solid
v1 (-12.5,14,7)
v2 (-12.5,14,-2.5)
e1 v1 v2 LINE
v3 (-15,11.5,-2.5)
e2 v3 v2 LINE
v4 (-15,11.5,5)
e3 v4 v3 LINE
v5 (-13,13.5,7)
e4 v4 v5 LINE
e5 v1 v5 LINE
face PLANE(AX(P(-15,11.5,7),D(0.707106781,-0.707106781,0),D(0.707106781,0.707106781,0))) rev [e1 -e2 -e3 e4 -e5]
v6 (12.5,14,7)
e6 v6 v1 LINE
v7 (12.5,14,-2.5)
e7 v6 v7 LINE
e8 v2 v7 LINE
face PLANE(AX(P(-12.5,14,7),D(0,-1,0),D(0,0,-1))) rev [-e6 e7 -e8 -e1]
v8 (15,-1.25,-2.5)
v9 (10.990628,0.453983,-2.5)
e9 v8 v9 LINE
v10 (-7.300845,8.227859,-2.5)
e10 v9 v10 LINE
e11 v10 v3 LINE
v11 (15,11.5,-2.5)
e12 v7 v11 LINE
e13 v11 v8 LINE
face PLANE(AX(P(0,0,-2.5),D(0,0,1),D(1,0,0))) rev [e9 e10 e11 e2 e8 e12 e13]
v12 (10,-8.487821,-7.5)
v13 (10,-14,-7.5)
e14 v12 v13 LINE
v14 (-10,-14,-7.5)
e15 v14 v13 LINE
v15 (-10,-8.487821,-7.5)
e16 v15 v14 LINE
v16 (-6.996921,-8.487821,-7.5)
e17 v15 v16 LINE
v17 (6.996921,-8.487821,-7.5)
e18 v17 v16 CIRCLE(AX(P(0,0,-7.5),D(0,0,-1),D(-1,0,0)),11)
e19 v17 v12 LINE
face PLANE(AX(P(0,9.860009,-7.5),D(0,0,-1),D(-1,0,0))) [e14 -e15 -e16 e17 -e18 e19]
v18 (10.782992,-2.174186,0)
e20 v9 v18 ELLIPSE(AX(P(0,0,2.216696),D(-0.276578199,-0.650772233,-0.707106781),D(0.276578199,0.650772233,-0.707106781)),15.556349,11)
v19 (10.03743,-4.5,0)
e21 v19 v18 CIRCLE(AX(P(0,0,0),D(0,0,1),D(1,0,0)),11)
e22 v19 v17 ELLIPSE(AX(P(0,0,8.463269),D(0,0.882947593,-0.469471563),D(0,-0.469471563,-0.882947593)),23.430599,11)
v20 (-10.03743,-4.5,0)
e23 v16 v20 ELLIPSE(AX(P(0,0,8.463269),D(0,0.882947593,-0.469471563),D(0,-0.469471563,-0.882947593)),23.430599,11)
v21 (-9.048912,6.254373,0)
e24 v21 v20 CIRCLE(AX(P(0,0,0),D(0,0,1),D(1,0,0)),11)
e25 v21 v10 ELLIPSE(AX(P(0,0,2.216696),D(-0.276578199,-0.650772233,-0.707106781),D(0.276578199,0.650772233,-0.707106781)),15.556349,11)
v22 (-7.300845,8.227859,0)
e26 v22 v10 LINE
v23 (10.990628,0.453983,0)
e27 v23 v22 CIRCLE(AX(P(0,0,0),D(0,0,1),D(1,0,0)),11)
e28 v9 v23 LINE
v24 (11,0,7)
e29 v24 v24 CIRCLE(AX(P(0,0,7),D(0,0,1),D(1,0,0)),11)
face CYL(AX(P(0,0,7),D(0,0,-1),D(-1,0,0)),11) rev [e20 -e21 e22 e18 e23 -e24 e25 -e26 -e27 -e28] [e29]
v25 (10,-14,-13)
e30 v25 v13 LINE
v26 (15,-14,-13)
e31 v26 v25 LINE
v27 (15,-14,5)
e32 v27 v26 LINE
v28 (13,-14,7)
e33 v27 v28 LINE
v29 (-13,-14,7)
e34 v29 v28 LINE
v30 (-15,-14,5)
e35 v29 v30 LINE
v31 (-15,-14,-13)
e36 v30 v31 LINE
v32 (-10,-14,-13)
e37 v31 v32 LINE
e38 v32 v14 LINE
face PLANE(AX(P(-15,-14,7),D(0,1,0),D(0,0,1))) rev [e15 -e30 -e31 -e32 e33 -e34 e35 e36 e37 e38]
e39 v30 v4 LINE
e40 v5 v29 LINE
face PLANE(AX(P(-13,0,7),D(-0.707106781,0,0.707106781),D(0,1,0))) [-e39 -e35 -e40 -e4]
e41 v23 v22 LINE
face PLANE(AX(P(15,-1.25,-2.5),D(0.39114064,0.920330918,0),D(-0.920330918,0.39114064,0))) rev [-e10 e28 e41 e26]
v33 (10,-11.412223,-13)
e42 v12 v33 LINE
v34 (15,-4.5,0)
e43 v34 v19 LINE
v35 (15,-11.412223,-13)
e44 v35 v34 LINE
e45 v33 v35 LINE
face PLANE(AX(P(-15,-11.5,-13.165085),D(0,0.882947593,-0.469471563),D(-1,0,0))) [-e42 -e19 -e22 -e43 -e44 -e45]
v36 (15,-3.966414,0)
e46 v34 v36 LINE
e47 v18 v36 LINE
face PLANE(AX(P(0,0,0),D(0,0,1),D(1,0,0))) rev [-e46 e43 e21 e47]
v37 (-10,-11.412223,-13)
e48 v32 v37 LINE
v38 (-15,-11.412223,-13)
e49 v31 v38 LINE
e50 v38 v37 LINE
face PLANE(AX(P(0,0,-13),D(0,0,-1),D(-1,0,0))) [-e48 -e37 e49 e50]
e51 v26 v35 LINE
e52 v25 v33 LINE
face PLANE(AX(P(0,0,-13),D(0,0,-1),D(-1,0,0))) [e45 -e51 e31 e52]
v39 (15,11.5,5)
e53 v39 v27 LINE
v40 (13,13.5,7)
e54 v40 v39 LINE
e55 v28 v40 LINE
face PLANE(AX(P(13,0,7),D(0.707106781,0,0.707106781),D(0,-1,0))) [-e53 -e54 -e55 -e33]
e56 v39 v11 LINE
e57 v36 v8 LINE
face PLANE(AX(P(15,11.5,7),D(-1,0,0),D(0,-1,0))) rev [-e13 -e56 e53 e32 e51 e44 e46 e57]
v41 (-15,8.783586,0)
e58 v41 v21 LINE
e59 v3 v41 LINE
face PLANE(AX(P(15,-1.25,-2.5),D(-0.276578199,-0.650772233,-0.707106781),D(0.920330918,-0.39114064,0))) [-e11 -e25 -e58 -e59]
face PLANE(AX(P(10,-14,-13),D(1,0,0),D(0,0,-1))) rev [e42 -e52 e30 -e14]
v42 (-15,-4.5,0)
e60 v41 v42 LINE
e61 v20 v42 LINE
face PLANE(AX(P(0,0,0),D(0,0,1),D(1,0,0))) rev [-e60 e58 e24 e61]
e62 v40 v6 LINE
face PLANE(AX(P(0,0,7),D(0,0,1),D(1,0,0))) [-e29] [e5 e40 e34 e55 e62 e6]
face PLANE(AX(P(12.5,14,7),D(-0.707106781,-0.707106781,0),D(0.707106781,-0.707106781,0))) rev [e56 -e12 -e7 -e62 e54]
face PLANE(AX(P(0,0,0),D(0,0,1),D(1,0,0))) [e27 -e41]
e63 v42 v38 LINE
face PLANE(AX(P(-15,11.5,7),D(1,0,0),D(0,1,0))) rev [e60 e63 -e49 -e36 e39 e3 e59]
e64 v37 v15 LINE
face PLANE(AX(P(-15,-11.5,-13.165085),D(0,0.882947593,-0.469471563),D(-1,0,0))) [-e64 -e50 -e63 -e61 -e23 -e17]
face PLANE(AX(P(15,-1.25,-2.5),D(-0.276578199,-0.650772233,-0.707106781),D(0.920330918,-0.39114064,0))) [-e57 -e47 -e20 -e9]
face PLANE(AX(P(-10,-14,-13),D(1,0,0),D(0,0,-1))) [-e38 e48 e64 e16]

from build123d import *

# Parameters (mm, degrees)
SKETCH1_R           = 11
BOSS_EXTRUDE1_DEPTH = 7
SKETCH2_W           = 5
SKETCH2_H           = 2.5
BOSS_EXTRUDE2_DEPTH = 13
CHAMFER2_SIZE       = 2
BOSS_EXTRUDE6_DEPTH = 2.5
CHAMFER3_SIZE       = 2
CHAMFER4_SIZE       = 2
BOSS_EXTRUDE4_DEPTH = 2.5
CHAMFER6_SIZE       = 2.5
CHAMFER7_SIZE       = 7
CHAMFER7_SIZE_2     = 13.165085257


with BuildPart() as part:
    # Sketch1 → Boss-Extrude1 (new body)
    with BuildSketch(Plane.XY):
        Polygon((-15, 11.5), (-12.5, 14), (12.5, 14), (15, 11.5), (15, -14), (-15, -14), align=None)
        Circle(SKETCH1_R, mode=Mode.SUBTRACT)
    extrude(amount=BOSS_EXTRUDE1_DEPTH)

    # Sketch2 → Boss-Extrude2 (add)
    with BuildSketch(Plane(origin=(0, 0, 0), x_dir=(-1, 0, 0), z_dir=(0, 0, -1))):
        with Locations((-12.5, -12.75)):
            Rectangle(SKETCH2_W, SKETCH2_H)
        with Locations((12.5, -12.75)):
            Rectangle(SKETCH2_W, SKETCH2_H)
    extrude(amount=BOSS_EXTRUDE2_DEPTH)

    # Chamfer2
    chamfer2_edges = [part.edges().sort_by_distance(p)[0] for p in [
        (-10, -12.75, 0),
        (10, -12.75, 0),
    ]]
    chamfer(chamfer2_edges, length=CHAMFER2_SIZE)

    # Sketch5 → Boss-Extrude6 (add)
    with BuildSketch(Plane.XZ.offset(14)):
        Polygon((-10, -2), (-10, -7.5), (10, -7.5), (10, -2), (8, 0), (-8, 0), align=None)
    extrude(amount=-BOSS_EXTRUDE6_DEPTH)

    # Chamfer3
    chamfer3_edges = [part.edges().sort_by_distance(p)[0] for p in [
        (15, -1.25, 7),
    ]]
    chamfer(chamfer3_edges, length=CHAMFER3_SIZE)

    # Chamfer4
    chamfer4_edges = [part.edges().sort_by_distance(p)[0] for p in [
        (-15, -1.25, 7),
    ]]
    chamfer(chamfer4_edges, length=CHAMFER4_SIZE)

    # Sketch4 → Boss-Extrude4 (add)
    with BuildSketch(Plane(origin=(0, 0, 0), x_dir=(-1, 0, 0), z_dir=(0, 0, -1))):
        Polygon((-15, -1.25), (15, 11.5), (12.5, 14), (-12.5, 14), (-15, 11.5), align=None)
    extrude(amount=BOSS_EXTRUDE4_DEPTH)

    # Chamfer6
    # the kernel refuses this chamfer: 2.5 mm, written as the material it adds along each edge
    with BuildSketch(Plane(origin=(20.916998416, -3.764724327, 0), x_dir=(-0.39099275668343275, -0.9199829569021947, 0.02749587661058635), z_dir=(-0.9203309184584746, 0.39114064034485174, 0))) as chamfer6_piece_1_section:
        Polygon((CHAMFER6_SIZE * 0.999621916911, -CHAMFER6_SIZE * 0.0274958766106), (-CHAMFER6_SIZE * 0.0274958766106, -CHAMFER6_SIZE * 0.999621916911), (0, 0), align=None)
    chamfer6_piece_1 = extrude(amount=17.214861222, mode=Mode.PRIVATE)
    chamfer6_piece_1 = chamfer6_piece_1 - Plane(origin=(0, 0, -0.830769879), x_dir=(1, 0, 0), z_dir=(0, 0, -1)) * Cylinder(11, 45, mode=Mode.PRIVATE)
    chamfer6_piece_1 = split(chamfer6_piece_1, bisect_by=Plane(origin=(15, -1.305255327, -0.830769879), z_dir=(-1, 0, 0)), keep=Keep.TOP, mode=Mode.PRIVATE)
    add(chamfer6_piece_1)
    with BuildSketch(Plane(origin=(-1.383846422, 5.71313473, 0), x_dir=(-0.39099275668343275, -0.9199829569021946, 0.02749587661058637), z_dir=(-0.9203309184584746, 0.39114064034485174, 0))) as chamfer6_piece_2_section:
        Polygon((CHAMFER6_SIZE * 0.999621916911, -CHAMFER6_SIZE * 0.0274958766106), (-CHAMFER6_SIZE * 0.0274958766106, -CHAMFER6_SIZE * 0.999621916911), (0, 0), align=None)
    chamfer6_piece_2 = extrude(amount=21.224052785, mode=Mode.PRIVATE)
    chamfer6_piece_2 = chamfer6_piece_2 - Plane(origin=(0, 0, -0.851096237), x_dir=(1, 0, 0), z_dir=(0, 0, -1)) * Cylinder(11, 53, mode=Mode.PRIVATE)
    chamfer6_piece_2 = split(chamfer6_piece_2, bisect_by=Plane(origin=(-15, 9.126408424, -0.851096237), z_dir=(1, 0, 0)), keep=Keep.TOP, mode=Mode.PRIVATE)
    add(chamfer6_piece_2)

    # Chamfer7
    # the kernel refuses this chamfer: 13.165085257, 7 mm, written as the material it adds along each edge
    with BuildSketch(Plane(origin=(-15, -11.5, 0), x_dir=(0, 0.9979482451756082, 0.06402577567608186), z_dir=(1, 0, 0))) as chamfer7_piece_1_section:
        Polygon((CHAMFER7_SIZE * 0.997948245176, -CHAMFER7_SIZE * 0.0640257756761), (-CHAMFER7_SIZE_2 * 0.0640257756781, -CHAMFER7_SIZE_2 * 0.997948245208), (0, 0), align=None)
    chamfer7_piece_1 = extrude(amount=30, mode=Mode.PRIVATE)
    chamfer7_piece_1 = chamfer7_piece_1 - Plane(origin=(0, 0, -3.073682767), x_dir=(1, 0, 0), z_dir=(0, 0, -1)) * Cylinder(11, 113, mode=Mode.PRIVATE)
    chamfer7_piece_1 = split(chamfer7_piece_1, bisect_by=Plane(origin=(-12.500128058, -8.887755394, -7.5), z_dir=(0, 0, 1)), keep=Keep.TOP, mode=Mode.PRIVATE)
    chamfer7_piece_1 = split(chamfer7_piece_1, bisect_by=Plane(origin=(-10, -8.887755394, -3.073682767), z_dir=(-1, 0, 0)), keep=Keep.TOP, mode=Mode.PRIVATE)
    add(chamfer7_piece_1)
    with BuildSketch(Plane(origin=(-15, -11.5, 0), x_dir=(0, 0.9979482451756082, 0.06402577567608186), z_dir=(1, 0, 0))) as chamfer7_piece_2_section:
        Polygon((CHAMFER7_SIZE * 0.997948245176, -CHAMFER7_SIZE * 0.0640257756761), (-CHAMFER7_SIZE_2 * 0.0640257756781, -CHAMFER7_SIZE_2 * 0.997948245208), (0, 0), align=None)
    chamfer7_piece_2 = extrude(amount=30, mode=Mode.PRIVATE)
    chamfer7_piece_2 = split(chamfer7_piece_2, bisect_by=Plane(origin=(-12.5, -10.721530873, -7.5), z_dir=(0, 0, -1)), keep=Keep.TOP, mode=Mode.PRIVATE)
    chamfer7_piece_2 = split(chamfer7_piece_2, bisect_by=Plane(origin=(-10, -10.721530873, -9.597564575), z_dir=(-1, 0, 0)), keep=Keep.TOP, mode=Mode.PRIVATE)
    chamfer7_piece_2 = split(chamfer7_piece_2, bisect_by=Plane(origin=(-12.5, -10.721530873, -13), z_dir=(0, 0, 1)), keep=Keep.TOP, mode=Mode.PRIVATE)
    add(chamfer7_piece_2)
    with BuildSketch(Plane(origin=(-15, -11.5, 0), x_dir=(0, 0.9979482451756082, 0.06402577567608186), z_dir=(1, 0, 0))) as chamfer7_piece_3_section:
        Polygon((CHAMFER7_SIZE * 0.997948245176, -CHAMFER7_SIZE * 0.0640257756761), (-CHAMFER7_SIZE_2 * 0.0640257756781, -CHAMFER7_SIZE_2 * 0.997948245208), (0, 0), align=None)
    chamfer7_piece_3 = extrude(amount=30, mode=Mode.PRIVATE)
    chamfer7_piece_3 = chamfer7_piece_3 - Plane(origin=(0, 0, -3.793876077), x_dir=(1, 0, 0), z_dir=(0, 0, -1)) * Cylinder(11, 113, mode=Mode.PRIVATE)
    chamfer7_piece_3 = split(chamfer7_piece_3, bisect_by=Plane(origin=(-9.499486782, -6.598719884, -7.5), z_dir=(0, 0, 1)), keep=Keep.TOP, mode=Mode.PRIVATE)
    chamfer7_piece_3 = split(chamfer7_piece_3, bisect_by=Plane(origin=(10, -6.598719884, -3.793876077), z_dir=(-1, 0, 0)), keep=Keep.TOP, mode=Mode.PRIVATE)
    chamfer7_piece_3 = split(chamfer7_piece_3, bisect_by=Plane(origin=(-10, -6.598719884, -3.793876077), z_dir=(1, 0, 0)), keep=Keep.TOP, mode=Mode.PRIVATE)
    add(chamfer7_piece_3)
    with BuildSketch(Plane(origin=(-15, -11.5, 0), x_dir=(0, 0.9979482451756082, 0.06402577567608186), z_dir=(1, 0, 0))) as chamfer7_piece_4_section:
        Polygon((CHAMFER7_SIZE * 0.997948245176, -CHAMFER7_SIZE * 0.0640257756761), (-CHAMFER7_SIZE_2 * 0.0640257756781, -CHAMFER7_SIZE_2 * 0.997948245208), (0, 0), align=None)
    chamfer7_piece_4 = extrude(amount=30, mode=Mode.PRIVATE)
    chamfer7_piece_4 = split(chamfer7_piece_4, bisect_by=Plane(origin=(12.5, -10.721530873, -7.5), z_dir=(0, 0, -1)), keep=Keep.TOP, mode=Mode.PRIVATE)
    chamfer7_piece_4 = split(chamfer7_piece_4, bisect_by=Plane(origin=(10, -10.721530873, -9.597564575), z_dir=(1, 0, 0)), keep=Keep.TOP, mode=Mode.PRIVATE)
    chamfer7_piece_4 = split(chamfer7_piece_4, bisect_by=Plane(origin=(12.5, -10.721530873, -13), z_dir=(0, 0, 1)), keep=Keep.TOP, mode=Mode.PRIVATE)
    add(chamfer7_piece_4)
    with BuildSketch(Plane(origin=(-15, -11.5, 0), x_dir=(0, 0.9979482451756082, 0.06402577567608186), z_dir=(1, 0, 0))) as chamfer7_piece_5_section:
        Polygon((CHAMFER7_SIZE * 0.997948245176, -CHAMFER7_SIZE * 0.0640257756761), (-CHAMFER7_SIZE_2 * 0.0640257756781, -CHAMFER7_SIZE_2 * 0.997948245208), (0, 0), align=None)
    chamfer7_piece_5 = extrude(amount=30, mode=Mode.PRIVATE)
    chamfer7_piece_5 = chamfer7_piece_5 - Plane(origin=(0, 0, -3.073682766), x_dir=(1, 0, 0), z_dir=(0, 0, -1)) * Cylinder(11, 113, mode=Mode.PRIVATE)
    chamfer7_piece_5 = split(chamfer7_piece_5, bisect_by=Plane(origin=(12.500128057, -8.887755394, -7.5), z_dir=(0, 0, 1)), keep=Keep.TOP, mode=Mode.PRIVATE)
    chamfer7_piece_5 = split(chamfer7_piece_5, bisect_by=Plane(origin=(10, -8.887755394, -3.073682766), z_dir=(1, 0, 0)), keep=Keep.TOP, mode=Mode.PRIVATE)
    add(chamfer7_piece_5)


solid = part.part
